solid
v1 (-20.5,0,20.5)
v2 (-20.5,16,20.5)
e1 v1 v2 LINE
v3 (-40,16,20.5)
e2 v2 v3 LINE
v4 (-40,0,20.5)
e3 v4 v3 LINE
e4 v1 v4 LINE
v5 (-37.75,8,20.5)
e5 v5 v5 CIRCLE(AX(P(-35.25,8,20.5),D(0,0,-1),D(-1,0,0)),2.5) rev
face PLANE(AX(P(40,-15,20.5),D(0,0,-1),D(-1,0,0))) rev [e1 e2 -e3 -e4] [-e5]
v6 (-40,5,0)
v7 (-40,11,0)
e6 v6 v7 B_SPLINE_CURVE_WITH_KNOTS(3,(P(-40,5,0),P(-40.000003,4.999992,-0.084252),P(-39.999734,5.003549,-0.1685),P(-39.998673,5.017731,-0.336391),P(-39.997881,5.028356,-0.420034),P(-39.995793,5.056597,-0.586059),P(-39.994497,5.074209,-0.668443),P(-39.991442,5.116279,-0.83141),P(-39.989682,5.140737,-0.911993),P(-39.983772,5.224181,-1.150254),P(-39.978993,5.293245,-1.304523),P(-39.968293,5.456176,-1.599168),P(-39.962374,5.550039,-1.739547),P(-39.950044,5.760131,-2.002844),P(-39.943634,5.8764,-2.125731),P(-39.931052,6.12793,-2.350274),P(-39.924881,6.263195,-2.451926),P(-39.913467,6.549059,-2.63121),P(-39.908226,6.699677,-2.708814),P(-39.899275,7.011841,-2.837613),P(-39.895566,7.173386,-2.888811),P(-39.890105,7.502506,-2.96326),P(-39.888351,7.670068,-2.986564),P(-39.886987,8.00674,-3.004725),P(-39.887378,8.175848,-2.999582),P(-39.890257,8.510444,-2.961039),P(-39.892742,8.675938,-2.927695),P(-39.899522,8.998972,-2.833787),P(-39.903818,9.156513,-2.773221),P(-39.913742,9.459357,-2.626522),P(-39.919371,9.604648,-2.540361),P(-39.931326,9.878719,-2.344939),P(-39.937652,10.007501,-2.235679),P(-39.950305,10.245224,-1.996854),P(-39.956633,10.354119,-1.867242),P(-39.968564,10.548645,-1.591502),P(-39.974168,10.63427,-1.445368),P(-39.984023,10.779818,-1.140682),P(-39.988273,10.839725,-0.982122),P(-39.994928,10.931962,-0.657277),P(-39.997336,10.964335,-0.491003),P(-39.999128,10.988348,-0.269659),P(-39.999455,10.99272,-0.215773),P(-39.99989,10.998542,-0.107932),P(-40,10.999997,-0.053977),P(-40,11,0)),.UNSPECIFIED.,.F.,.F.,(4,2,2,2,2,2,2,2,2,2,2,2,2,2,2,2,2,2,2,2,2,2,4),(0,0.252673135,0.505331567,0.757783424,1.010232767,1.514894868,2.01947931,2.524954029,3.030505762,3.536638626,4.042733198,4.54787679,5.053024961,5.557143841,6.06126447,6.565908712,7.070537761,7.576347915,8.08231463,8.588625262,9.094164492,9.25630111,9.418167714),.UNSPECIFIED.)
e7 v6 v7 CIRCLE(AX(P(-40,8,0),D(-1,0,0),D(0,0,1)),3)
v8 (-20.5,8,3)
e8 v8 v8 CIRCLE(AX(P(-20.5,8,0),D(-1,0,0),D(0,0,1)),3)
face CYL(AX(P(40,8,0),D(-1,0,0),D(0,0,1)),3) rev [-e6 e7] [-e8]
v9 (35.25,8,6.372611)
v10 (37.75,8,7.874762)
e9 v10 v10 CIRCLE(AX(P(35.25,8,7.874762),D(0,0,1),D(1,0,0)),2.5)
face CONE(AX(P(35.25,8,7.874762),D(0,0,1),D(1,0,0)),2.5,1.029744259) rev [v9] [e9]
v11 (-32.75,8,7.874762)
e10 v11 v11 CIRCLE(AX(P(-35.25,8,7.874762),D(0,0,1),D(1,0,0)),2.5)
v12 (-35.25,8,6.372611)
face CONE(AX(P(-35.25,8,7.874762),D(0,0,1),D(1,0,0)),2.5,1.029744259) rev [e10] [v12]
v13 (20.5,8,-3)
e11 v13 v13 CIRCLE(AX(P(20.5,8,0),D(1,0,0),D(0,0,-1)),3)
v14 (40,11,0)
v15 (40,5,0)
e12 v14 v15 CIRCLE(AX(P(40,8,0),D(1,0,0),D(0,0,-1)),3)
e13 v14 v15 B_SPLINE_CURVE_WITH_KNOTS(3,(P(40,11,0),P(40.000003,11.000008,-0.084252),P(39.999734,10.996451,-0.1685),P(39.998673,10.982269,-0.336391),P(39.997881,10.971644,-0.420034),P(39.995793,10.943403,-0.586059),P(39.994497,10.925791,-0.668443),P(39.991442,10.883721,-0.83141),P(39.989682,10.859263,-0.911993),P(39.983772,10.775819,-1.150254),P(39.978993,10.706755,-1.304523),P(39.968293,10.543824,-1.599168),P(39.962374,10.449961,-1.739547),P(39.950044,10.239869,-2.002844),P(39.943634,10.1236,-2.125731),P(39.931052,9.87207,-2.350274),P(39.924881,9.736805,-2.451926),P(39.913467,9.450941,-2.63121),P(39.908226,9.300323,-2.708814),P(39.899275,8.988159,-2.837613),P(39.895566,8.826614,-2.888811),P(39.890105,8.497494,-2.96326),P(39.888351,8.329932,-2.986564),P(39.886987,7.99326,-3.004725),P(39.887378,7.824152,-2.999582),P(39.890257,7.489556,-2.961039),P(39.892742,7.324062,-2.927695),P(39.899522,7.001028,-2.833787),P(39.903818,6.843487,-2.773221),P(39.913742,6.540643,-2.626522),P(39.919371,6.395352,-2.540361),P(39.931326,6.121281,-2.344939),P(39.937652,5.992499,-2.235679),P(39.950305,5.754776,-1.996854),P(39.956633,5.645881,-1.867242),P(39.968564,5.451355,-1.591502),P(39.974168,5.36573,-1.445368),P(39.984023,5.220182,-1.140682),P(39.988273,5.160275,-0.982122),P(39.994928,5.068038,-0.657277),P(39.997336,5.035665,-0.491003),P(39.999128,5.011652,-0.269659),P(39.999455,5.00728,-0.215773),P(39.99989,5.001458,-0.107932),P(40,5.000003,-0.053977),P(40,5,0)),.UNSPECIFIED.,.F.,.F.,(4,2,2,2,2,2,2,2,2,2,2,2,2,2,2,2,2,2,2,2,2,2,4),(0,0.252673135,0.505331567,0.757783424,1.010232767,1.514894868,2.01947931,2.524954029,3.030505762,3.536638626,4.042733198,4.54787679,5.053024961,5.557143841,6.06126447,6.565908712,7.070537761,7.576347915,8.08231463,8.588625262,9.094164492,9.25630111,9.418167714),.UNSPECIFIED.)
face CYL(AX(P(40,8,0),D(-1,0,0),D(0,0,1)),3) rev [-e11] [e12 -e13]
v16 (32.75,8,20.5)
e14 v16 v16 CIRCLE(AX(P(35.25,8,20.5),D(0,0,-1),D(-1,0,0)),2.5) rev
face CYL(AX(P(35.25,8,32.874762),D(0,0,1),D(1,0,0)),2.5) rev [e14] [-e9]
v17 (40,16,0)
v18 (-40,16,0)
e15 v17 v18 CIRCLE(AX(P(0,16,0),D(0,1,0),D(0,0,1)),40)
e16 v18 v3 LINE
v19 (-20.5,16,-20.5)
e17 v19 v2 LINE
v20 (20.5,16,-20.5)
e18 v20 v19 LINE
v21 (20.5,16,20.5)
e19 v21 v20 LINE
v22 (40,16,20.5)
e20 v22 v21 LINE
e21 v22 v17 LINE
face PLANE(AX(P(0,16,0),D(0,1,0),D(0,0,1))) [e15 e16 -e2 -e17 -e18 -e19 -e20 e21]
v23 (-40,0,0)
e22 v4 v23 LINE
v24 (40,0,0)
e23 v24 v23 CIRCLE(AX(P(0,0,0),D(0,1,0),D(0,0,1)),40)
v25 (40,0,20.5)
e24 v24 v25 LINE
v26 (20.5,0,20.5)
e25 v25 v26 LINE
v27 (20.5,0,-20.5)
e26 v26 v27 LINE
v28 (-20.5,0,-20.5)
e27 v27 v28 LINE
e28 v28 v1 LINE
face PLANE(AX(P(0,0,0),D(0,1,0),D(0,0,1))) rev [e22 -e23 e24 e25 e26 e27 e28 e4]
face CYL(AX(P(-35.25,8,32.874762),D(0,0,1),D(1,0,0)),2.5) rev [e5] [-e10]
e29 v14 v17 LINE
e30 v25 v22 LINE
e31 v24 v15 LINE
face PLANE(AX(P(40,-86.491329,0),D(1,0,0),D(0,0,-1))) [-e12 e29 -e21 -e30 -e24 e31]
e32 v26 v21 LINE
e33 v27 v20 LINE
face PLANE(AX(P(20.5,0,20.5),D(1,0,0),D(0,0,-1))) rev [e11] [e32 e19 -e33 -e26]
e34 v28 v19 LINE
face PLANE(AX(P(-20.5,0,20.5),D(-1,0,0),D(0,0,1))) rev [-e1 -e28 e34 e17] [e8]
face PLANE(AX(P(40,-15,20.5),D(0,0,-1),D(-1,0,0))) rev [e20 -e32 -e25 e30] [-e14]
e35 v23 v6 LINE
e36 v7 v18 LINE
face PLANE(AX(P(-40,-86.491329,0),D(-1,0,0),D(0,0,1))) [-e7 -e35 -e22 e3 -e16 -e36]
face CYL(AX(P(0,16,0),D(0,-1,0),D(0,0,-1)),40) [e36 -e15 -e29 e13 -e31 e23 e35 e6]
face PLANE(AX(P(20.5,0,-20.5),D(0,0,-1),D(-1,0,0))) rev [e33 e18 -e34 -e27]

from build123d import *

# Parameters (mm, degrees)
SKETCH1_R                 = 40
BOSS_EXTRUDE1_DEPTH       = 16
SKETCH2_W                 = 41
SKETCH2_H                 = 41
CUT_EXTRUDE1_DEPTH        = 59.787753827
SKETCH13_W                = 61
SKETCH13_H                = 46
BOSS_EXTRUDE4_DEPTH       = 75
SKETCH14_W                = 49
SKETCH14_H                = 67
CUT_EXTRUDE2_DEPTH        = 35
SKETCH15_W                = 49
SKETCH15_H                = 61
CUT_EXTRUDE3_DEPTH        = 5
FILLET1_R                 = 10
FILLET2_R                 = 5
CUT_EXTRUDE5_REACH        = 110.08
SKETCH17_R                = 41
BOSS_EXTRUDE5_DEPTH       = 16
CUT_EXTRUDE4_DEPTH        = 118.224144271
CUT_EXTRUDE4_DEPTH_BACK   = 118.224144271
SKETCH16_R                = 3
F_5_0MM_DOWEL_HOLE1_D     = 5
F_5_0MM_DOWEL_HOLE1_DEPTH = 25
F_5_0MM_DOWEL_HOLE1_TIP   = 1.502151548
CUT_EXTRUDE6_DEPTH        = 109.079831643
CUT_EXTRUDE6_DEPTH_BACK   = 109.079831643
SKETCH21_W                = 80
SKETCH21_H                = 75


with BuildPart() as part:
    # Sketch1 → Boss-Extrude1 (new body)
    with BuildSketch(Plane(origin=(0, 0, 0), x_dir=(1, 0, 0), z_dir=(0, 1, 0))):
        with Locations(Location((0, 0, 0), (0, 0, 270))):
            Circle(SKETCH1_R)
    extrude(amount=BOSS_EXTRUDE1_DEPTH)

    # Sketch2 → Cut-Extrude1 (cut, through all)
    with BuildSketch(Plane(origin=(0, 16, 0), x_dir=(1, 0, 0), z_dir=(0, 1, 0))):
        Rectangle(SKETCH2_W, SKETCH2_H)
    extrude(amount=-CUT_EXTRUDE1_DEPTH, mode=Mode.SUBTRACT)

    # Sketch13 → Boss-Extrude4 (add)
    with BuildSketch(Plane(origin=(0, 0, 20.5), x_dir=(-1, 0, 0), z_dir=(0, 0, -1))):
        with Locations((0, 8)):
            Rectangle(SKETCH13_W, SKETCH13_H)
    extrude(amount=-BOSS_EXTRUDE4_DEPTH)

    # Sketch14 → Cut-Extrude2 (cut)
    with BuildSketch(Plane(origin=(0, 31, 0), x_dir=(1, 0, 0), z_dir=(0, 1, 0))):
        with Locations((0, -62)):
            Rectangle(SKETCH14_W, SKETCH14_H)
    extrude(amount=-CUT_EXTRUDE2_DEPTH, mode=Mode.SUBTRACT)

    # Sketch15 → Cut-Extrude3 (cut)
    with BuildSketch(Plane(origin=(0, -4, 0), x_dir=(1, 0, 0), z_dir=(0, 1, 0))):
        with Locations((0, -59)):
            Rectangle(SKETCH15_W, SKETCH15_H)
    extrude(amount=-CUT_EXTRUDE3_DEPTH, mode=Mode.SUBTRACT)

    # Fillet1
    fillet1_edges = [part.edges().sort_by_distance(p)[0] for p in [
        (-27.5, 31, 95.5),
        (27.5, 31, 95.5),
    ]]
    fillet(fillet1_edges, radius=FILLET1_R)

    # Fillet2
    fillet2_edges = [part.edges().sort_by_distance(p)[0] for p in [
        (0, -9, 89.5),
        (0, -15, 95.5),
        (0, -15, 20.5),
        (0, -9, 28.5),
    ]]
    fillet(fillet2_edges, radius=FILLET2_R - 0.0001)  # a hair under: the kernel refuses the full size

    # Sketch17 → Cut-Extrude5 (cut, up to next)
    with BuildSketch(Plane(origin=(0, 16, 0), x_dir=(1, 0, 0), z_dir=(0, 1, 0)), mode=Mode.PRIVATE) as cut_extrude5_sk1:
        Circle(SKETCH17_R)
    cut_extrude5_tool1 = extrude(cut_extrude5_sk1.sketch, amount=CUT_EXTRUDE5_REACH, mode=Mode.PRIVATE) & part.part
    add(cut_extrude5_tool1.solids().sort_by_distance((0, 16, 0))[0], mode=Mode.SUBTRACT)

    # Sketch18 → Boss-Extrude5 (add)
    with BuildSketch(Plane(origin=(0, 16, 0), x_dir=(1, 0, 0), z_dir=(0, 1, 0))):
        Polygon((20.5, 0), (20.5, -20.5), (-20.5, -20.5), (-20.5, 0), (-40, 0), (-40, -32.874762357), (-24.5, -32.874762357), (-24.5, -28.5), (24.5, -28.5), (24.5, -32.874762357), (40, -32.874762357), (40, 0), align=None)
    extrude(amount=-BOSS_EXTRUDE5_DEPTH)

    # Sketch16 → Cut-Extrude4 (cut, two sides: drawn at the far end of the back side and taken through both)
    with BuildSketch(Plane.ZY.offset(-20.5).offset(-CUT_EXTRUDE4_DEPTH_BACK)):
        with Locations(Location((0, 8, 0), (0, 0, 270))):
            Circle(SKETCH16_R)
    extrude(amount=CUT_EXTRUDE4_DEPTH + CUT_EXTRUDE4_DEPTH_BACK, mode=Mode.SUBTRACT)

    # Ø5.0mm Dowel Hole1
    with Locations(Plane(origin=(-35.25, 8, 32.874762357), x_dir=(1, 0, 0), z_dir=(0, 0, 1))):
        with Locations((0, 0), (70.5, 0)):
            Hole(F_5_0MM_DOWEL_HOLE1_D / 2, depth=F_5_0MM_DOWEL_HOLE1_DEPTH)
            with Locations((0, 0, -(F_5_0MM_DOWEL_HOLE1_DEPTH + F_5_0MM_DOWEL_HOLE1_TIP / 2))):  # 118° drill point
                Cone(0, F_5_0MM_DOWEL_HOLE1_D / 2, F_5_0MM_DOWEL_HOLE1_TIP, mode=Mode.SUBTRACT)

    # Sketch21 → Cut-Extrude6 (cut, two sides: drawn at the far end of the back side and taken through both)
    with BuildSketch(Plane(origin=(0, 16, 0), x_dir=(1, 0, 0), z_dir=(0, 1, 0)).offset(-CUT_EXTRUDE6_DEPTH_BACK)):
        with Locations((0, -58)):
            Rectangle(SKETCH21_W, SKETCH21_H)
    extrude(amount=CUT_EXTRUDE6_DEPTH + CUT_EXTRUDE6_DEPTH_BACK, mode=Mode.SUBTRACT)


solid = part.part
